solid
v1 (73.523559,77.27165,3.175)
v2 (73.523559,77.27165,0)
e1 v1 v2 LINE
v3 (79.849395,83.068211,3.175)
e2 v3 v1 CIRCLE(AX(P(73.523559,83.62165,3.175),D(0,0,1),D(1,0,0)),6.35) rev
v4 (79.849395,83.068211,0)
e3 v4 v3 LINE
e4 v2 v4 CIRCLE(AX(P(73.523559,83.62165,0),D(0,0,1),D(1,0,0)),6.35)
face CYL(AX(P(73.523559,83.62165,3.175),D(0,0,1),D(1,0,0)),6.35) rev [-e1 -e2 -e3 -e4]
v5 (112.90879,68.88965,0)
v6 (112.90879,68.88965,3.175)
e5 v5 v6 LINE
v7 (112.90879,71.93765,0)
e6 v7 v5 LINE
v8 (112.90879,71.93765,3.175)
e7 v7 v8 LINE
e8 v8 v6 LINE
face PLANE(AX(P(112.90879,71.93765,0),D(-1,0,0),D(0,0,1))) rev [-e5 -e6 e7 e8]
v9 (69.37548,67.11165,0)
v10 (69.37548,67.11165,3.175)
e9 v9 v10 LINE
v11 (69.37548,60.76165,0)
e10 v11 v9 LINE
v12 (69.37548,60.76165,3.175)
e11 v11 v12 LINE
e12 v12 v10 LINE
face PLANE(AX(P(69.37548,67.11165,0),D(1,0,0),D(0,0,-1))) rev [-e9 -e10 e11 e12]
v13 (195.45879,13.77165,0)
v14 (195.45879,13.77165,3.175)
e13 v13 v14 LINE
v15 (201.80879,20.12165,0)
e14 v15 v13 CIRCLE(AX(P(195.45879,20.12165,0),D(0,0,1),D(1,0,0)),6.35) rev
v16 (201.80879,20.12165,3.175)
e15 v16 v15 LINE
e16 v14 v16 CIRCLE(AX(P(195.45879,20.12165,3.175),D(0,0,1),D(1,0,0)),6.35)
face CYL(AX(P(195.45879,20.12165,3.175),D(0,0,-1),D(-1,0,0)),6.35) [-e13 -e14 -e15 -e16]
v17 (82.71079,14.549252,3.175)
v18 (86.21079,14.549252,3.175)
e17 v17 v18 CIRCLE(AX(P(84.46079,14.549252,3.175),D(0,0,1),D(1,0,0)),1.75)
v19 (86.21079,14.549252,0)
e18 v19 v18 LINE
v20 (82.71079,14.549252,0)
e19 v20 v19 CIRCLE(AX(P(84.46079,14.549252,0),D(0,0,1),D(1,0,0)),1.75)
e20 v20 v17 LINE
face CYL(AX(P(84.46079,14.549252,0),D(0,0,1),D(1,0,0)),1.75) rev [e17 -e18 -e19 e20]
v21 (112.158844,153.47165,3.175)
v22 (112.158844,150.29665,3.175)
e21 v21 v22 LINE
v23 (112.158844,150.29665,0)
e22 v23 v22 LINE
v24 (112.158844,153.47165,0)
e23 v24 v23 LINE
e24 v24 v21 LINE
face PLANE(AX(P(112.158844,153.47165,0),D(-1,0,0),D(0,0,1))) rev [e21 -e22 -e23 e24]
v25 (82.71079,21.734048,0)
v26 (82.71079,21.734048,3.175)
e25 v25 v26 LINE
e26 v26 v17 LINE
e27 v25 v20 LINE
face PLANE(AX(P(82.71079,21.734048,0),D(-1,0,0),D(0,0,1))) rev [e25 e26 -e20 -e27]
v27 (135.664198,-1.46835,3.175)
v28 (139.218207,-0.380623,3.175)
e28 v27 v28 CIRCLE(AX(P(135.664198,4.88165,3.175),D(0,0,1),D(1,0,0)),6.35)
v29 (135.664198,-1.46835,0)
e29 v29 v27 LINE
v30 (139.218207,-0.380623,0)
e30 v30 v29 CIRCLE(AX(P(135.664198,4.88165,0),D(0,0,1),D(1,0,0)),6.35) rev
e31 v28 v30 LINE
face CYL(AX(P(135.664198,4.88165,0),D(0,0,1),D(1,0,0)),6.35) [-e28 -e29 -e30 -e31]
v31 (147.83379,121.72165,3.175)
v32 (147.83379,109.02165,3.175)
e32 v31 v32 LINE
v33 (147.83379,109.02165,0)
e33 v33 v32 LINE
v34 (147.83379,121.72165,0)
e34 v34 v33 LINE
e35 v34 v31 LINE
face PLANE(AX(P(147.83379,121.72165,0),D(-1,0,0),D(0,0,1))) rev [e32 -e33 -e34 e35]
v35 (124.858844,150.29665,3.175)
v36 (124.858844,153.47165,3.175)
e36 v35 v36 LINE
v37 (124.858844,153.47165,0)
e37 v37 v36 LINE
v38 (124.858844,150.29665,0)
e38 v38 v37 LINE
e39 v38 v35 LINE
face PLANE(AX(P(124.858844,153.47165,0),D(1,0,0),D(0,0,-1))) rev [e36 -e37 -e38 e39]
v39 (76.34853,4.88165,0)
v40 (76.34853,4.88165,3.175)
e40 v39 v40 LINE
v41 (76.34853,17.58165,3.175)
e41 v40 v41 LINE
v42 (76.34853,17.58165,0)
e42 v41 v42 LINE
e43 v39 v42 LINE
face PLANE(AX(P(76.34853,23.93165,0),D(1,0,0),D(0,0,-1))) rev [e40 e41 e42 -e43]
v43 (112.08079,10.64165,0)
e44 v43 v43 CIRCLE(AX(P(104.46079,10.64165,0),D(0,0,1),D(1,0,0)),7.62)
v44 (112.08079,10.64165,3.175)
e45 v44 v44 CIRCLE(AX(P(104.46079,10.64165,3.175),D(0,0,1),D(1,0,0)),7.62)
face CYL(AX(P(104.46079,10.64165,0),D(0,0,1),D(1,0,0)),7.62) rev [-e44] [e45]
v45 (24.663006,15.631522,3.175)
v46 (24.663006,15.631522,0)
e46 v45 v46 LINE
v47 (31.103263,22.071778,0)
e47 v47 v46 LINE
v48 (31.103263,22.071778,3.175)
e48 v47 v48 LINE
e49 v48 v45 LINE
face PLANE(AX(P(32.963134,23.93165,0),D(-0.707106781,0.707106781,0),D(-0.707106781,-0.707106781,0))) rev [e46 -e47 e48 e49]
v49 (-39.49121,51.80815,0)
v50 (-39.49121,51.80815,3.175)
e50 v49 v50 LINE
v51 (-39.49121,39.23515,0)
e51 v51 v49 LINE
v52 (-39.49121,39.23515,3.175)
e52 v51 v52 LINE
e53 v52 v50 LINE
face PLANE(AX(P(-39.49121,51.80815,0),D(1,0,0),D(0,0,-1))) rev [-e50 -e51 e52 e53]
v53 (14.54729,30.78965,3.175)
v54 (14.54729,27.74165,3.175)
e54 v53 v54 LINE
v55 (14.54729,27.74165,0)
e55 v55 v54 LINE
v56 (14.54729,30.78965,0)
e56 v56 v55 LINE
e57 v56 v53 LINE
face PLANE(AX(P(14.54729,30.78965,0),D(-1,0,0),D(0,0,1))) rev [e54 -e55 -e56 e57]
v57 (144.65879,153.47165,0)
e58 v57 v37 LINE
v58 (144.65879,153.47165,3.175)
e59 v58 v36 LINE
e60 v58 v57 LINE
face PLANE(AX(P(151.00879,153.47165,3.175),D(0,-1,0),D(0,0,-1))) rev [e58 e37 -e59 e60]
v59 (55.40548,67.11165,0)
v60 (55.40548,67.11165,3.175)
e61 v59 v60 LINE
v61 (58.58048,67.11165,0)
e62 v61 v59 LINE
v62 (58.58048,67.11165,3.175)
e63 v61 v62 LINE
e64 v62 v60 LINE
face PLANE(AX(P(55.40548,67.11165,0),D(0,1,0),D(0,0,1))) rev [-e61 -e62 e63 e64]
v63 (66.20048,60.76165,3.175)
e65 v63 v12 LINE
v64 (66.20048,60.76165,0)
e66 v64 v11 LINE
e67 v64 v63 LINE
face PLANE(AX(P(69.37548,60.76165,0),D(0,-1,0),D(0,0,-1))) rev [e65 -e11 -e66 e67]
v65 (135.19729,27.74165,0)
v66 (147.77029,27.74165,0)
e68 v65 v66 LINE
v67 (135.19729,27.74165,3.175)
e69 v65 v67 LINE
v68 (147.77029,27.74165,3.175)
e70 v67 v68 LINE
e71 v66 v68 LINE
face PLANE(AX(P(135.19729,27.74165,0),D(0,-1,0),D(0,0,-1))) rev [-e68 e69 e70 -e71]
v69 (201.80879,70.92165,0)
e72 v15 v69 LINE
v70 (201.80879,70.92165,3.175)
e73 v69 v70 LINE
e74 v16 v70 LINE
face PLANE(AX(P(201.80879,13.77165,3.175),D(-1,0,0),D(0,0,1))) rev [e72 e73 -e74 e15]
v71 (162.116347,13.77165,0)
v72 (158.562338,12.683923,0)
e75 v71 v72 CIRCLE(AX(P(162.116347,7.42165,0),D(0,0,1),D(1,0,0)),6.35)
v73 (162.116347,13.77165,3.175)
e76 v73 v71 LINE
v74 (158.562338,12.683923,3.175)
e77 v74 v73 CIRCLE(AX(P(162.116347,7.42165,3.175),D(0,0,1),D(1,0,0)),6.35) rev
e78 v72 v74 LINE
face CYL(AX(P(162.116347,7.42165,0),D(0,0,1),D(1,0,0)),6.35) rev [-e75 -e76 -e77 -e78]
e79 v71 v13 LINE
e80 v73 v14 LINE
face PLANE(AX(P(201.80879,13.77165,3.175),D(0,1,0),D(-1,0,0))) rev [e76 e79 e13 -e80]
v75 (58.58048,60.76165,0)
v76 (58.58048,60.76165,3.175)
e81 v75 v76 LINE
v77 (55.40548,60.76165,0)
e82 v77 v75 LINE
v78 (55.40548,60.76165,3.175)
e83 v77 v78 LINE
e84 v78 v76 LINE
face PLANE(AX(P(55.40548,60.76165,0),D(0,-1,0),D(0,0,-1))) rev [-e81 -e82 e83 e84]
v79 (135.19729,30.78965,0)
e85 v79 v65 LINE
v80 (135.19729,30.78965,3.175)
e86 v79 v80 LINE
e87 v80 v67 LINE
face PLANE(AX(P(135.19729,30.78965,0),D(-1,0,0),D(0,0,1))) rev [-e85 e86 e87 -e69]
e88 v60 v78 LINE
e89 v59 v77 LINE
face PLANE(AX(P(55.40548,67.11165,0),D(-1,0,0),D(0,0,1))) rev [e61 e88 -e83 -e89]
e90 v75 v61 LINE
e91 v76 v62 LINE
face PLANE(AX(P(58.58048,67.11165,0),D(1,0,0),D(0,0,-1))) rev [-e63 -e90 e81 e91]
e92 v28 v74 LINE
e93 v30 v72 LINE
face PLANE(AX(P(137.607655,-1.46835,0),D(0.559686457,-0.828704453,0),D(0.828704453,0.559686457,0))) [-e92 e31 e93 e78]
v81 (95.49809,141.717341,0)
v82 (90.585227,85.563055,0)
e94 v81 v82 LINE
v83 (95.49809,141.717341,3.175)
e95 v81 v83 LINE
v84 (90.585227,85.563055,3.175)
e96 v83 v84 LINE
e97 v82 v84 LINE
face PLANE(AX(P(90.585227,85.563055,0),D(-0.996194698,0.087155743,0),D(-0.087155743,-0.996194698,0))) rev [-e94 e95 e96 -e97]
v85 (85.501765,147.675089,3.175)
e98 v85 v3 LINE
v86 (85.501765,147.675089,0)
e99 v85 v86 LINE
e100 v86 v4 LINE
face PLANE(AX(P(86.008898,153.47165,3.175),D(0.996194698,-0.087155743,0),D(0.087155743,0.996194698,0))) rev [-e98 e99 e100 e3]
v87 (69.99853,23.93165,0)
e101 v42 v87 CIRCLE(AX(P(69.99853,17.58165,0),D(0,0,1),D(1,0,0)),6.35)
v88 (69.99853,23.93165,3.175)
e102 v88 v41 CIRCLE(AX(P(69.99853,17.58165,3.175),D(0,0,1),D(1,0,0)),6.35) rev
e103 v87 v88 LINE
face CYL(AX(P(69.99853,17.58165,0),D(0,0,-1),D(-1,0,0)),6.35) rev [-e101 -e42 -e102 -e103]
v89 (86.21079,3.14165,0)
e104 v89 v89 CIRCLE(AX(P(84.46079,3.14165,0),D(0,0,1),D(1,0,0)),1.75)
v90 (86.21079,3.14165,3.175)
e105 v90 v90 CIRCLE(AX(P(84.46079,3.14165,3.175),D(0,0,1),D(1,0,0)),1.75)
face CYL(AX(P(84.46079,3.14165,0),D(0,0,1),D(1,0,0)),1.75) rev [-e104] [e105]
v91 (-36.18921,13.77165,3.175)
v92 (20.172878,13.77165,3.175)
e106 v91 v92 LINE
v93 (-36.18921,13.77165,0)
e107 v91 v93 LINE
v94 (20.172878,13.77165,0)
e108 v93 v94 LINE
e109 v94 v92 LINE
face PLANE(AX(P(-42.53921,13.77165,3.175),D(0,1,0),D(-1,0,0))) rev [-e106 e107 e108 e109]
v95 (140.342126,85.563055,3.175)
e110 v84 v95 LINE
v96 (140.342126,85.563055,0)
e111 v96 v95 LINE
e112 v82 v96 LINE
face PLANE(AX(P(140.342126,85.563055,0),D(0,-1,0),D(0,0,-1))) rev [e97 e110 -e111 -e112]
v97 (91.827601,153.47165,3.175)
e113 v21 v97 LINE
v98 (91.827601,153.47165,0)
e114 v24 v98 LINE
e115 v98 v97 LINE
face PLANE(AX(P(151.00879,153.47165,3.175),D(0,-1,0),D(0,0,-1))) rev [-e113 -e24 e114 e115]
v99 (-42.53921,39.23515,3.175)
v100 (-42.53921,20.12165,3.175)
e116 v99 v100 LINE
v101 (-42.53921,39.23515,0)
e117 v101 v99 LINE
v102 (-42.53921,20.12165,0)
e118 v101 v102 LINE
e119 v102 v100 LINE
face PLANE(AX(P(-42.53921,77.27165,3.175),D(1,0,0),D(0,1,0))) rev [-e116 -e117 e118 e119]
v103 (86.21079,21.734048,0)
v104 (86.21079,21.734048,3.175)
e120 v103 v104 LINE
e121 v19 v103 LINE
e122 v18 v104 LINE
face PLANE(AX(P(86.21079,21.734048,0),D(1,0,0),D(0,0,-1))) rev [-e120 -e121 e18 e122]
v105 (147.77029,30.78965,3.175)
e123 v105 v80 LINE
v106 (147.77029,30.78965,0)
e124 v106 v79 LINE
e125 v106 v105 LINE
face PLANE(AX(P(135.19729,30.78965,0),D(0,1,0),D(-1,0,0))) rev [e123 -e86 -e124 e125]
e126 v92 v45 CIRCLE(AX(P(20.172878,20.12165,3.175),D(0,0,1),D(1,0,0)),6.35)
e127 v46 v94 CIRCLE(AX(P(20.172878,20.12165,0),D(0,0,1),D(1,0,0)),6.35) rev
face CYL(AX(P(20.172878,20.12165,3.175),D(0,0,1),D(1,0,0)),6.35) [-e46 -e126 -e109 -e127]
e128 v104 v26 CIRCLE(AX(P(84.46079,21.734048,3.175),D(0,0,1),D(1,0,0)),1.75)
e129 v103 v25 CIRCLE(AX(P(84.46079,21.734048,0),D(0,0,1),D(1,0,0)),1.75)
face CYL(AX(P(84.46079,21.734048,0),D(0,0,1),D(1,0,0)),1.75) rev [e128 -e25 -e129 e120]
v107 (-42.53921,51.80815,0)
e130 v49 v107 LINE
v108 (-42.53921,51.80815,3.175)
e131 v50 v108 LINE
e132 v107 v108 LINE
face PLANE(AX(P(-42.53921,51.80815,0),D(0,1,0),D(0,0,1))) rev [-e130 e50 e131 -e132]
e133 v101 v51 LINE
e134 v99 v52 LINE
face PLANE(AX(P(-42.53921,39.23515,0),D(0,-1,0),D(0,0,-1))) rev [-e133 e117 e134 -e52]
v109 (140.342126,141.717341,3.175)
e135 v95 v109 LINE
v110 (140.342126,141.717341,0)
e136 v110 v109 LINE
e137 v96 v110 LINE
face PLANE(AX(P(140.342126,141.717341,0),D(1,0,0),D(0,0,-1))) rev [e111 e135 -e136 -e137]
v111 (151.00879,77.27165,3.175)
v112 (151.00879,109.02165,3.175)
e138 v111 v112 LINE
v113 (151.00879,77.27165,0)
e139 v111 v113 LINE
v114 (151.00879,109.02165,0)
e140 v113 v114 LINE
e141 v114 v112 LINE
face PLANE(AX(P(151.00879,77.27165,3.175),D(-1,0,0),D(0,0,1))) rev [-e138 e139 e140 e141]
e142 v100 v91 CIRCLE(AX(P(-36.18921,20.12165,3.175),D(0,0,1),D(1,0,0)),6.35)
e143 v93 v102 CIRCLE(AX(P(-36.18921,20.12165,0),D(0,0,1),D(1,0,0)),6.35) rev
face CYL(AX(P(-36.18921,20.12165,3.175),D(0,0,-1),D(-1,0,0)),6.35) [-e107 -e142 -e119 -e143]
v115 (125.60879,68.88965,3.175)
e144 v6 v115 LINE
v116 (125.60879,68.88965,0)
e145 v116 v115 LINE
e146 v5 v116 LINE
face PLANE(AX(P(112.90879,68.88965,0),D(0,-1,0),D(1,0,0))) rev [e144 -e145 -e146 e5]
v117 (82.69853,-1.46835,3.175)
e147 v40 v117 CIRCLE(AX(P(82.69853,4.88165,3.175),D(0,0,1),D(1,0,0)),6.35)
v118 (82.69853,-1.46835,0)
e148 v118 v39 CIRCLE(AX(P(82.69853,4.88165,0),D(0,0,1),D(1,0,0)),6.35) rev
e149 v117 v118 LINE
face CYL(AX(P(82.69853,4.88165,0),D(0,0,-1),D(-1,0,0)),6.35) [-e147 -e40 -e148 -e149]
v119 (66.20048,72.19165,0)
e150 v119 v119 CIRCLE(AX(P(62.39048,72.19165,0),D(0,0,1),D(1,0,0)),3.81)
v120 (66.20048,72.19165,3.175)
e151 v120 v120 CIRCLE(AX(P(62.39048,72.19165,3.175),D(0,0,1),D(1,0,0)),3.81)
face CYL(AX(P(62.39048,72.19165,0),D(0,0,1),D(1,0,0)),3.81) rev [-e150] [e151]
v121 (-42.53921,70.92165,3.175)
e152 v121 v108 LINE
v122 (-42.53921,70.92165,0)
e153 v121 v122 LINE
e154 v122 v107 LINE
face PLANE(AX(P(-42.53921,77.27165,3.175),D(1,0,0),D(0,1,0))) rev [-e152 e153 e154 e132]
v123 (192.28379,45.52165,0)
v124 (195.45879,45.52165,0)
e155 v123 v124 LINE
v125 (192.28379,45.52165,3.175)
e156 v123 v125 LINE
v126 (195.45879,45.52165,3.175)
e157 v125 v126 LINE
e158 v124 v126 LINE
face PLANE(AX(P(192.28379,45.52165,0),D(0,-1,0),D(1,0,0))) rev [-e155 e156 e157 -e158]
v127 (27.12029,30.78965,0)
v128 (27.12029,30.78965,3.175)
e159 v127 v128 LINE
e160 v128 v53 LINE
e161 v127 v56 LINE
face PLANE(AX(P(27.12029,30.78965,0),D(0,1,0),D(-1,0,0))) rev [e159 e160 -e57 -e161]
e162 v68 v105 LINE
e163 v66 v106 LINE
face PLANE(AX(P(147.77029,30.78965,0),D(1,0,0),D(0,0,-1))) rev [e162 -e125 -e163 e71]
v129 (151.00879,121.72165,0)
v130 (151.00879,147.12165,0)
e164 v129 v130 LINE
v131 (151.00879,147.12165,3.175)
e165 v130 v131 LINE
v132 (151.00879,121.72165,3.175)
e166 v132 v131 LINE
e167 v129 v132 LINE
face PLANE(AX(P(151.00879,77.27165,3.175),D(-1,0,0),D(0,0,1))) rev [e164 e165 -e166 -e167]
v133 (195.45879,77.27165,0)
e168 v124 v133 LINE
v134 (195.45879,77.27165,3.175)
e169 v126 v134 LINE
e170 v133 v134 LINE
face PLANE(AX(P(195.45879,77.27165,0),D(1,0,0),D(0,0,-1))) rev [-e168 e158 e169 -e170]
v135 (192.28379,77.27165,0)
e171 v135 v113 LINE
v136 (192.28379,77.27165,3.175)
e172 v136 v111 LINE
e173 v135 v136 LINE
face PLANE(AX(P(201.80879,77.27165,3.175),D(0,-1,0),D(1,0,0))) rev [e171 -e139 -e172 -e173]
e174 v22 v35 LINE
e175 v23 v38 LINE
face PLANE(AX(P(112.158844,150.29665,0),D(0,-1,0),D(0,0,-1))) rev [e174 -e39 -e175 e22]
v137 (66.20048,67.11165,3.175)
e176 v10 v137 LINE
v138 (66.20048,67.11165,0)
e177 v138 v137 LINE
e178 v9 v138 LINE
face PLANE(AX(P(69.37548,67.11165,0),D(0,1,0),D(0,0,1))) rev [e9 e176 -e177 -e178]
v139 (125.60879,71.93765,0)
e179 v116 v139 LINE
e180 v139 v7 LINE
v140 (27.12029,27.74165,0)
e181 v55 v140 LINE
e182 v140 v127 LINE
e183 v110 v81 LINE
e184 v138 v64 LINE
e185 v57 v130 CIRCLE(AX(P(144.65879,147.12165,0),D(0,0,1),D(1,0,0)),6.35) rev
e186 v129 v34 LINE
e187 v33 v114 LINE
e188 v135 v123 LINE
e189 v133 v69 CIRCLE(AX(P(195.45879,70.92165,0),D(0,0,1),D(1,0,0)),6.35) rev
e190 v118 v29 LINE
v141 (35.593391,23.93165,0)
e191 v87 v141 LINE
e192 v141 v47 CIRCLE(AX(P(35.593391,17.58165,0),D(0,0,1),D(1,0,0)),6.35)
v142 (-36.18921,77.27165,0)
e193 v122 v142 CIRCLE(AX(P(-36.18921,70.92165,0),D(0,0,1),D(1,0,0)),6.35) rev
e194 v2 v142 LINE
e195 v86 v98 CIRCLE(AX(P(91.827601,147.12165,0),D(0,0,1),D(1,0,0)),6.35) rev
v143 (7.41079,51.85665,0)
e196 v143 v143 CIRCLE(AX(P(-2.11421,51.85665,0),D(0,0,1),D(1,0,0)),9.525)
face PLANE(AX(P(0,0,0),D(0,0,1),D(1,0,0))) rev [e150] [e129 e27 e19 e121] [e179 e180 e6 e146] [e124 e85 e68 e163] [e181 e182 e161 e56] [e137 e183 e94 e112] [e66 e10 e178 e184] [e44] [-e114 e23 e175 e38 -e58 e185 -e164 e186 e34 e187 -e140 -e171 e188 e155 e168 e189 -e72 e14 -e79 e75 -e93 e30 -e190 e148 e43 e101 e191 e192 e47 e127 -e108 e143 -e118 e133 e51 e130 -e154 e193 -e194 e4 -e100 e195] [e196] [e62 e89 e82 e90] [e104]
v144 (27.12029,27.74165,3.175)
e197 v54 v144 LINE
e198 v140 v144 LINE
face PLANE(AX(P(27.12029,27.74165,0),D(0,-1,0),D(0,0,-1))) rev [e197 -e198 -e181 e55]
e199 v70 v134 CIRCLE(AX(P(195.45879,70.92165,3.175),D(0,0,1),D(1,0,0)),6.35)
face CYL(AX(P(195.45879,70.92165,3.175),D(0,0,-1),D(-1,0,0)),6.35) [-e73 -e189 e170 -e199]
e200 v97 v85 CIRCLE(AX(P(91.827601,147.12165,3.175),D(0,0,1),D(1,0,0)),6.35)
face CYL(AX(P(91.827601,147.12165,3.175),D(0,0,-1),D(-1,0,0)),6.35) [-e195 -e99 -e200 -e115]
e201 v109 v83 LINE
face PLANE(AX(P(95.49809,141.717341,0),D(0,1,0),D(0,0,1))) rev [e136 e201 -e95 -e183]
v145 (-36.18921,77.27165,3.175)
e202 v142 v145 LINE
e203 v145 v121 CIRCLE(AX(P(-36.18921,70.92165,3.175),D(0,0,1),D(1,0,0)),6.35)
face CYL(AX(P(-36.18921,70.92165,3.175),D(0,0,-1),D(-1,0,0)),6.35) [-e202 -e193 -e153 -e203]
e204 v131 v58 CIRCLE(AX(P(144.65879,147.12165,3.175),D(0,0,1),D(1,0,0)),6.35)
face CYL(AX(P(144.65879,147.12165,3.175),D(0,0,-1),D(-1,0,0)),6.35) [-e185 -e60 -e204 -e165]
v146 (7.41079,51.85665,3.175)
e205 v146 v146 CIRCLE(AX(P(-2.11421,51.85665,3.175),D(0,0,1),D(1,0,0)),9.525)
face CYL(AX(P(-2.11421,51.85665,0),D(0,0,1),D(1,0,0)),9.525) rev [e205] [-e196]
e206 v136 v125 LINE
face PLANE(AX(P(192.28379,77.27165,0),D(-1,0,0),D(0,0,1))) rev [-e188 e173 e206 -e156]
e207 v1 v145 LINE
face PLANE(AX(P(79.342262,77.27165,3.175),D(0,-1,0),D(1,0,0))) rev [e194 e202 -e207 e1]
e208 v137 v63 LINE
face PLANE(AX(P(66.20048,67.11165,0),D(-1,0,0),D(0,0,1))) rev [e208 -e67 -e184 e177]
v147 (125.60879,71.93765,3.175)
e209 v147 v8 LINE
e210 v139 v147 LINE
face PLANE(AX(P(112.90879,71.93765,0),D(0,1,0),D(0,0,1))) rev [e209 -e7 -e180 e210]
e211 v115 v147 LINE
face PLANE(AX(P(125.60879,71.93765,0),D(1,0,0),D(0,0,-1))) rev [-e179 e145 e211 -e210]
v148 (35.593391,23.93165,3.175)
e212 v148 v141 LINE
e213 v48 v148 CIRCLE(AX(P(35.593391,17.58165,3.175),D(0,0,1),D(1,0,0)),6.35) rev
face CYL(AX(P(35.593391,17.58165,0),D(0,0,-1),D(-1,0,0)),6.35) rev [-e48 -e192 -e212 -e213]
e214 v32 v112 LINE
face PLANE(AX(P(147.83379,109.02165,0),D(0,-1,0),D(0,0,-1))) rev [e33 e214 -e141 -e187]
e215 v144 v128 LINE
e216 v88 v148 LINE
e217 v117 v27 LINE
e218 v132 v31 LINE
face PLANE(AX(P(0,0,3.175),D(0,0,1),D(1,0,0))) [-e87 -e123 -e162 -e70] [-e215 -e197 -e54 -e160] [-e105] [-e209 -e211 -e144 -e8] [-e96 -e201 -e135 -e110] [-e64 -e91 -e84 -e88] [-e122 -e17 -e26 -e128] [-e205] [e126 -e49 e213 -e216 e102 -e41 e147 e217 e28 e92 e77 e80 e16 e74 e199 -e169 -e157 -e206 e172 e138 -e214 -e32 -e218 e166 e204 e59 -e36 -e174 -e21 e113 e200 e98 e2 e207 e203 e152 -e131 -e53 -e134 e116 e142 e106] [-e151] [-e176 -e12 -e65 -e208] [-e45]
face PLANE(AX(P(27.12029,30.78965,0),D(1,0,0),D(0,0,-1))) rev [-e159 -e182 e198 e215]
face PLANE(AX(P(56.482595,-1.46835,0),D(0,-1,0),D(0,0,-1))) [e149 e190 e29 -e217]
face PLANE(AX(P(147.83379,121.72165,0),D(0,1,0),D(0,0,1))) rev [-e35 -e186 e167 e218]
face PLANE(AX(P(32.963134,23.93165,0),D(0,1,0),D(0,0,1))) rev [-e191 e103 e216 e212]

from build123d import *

# Parameters (mm, degrees)
MAIN_SIDE_DEPTH          = 3.175
SKETCH2_W                = 12.573
SKETCH2_H                = 3.048
BOTTOM_PLATE_HOLES_DEPTH = 254.555547868
SKETCH3_W                = 12.7
SKETCH3_H                = 3.048
CUT_EXTRUDE1_DEPTH       = 254.555547868
SKETCH4_W                = 3.048
SKETCH4_H                = 12.573
CUT_EXTRUDE2_DEPTH       = 254.555547868
SKETCH5_W                = 3.175
SKETCH5_H                = 31.75
CUT_EXTRUDE3_DEPTH       = 254.555547868
SKETCH6_R                = 9.525
CUT_EXTRUDE4_DEPTH       = 254.555547868
SKETCH7_W                = 12.7
SKETCH7_H                = 3.175
CUT_EXTRUDE5_DEPTH       = 254.555547868
SKETCH8_W                = 3.175
SKETCH8_H                = 12.7
CUT_EXTRUDE6_DEPTH       = 254.555547868
BOSS_EXTRUDE2_DEPTH      = 3.175
SKETCH10_R               = 1.75
SKETCH10_R_2             = 7.62
CUT_EXTRUDE7_DEPTH       = 254.555547868
FILLET1_R                = 6.35
SKETCH14_R               = 3.81
SKETCH14_W               = 3.175
SKETCH14_H               = 6.35
CUT_EXTRUDE8_DEPTH       = 254.555547868
CUT_EXTRUDE9_DEPTH       = 254.555547868
CUT_EXTRUDE10_DEPTH      = 254.555547868
FILLET2_R                = 6.35


with BuildPart() as part:
    # Sketch1 → Main Side (new body)
    with BuildSketch(Plane.XY):
        Polygon((62.123903317, 7.421650144), (131.966346795, 7.421650144), (147.472889282, 13.771650144), (201.808790274, 13.771650144), (201.808790274, 77.271650144), (151.008790274, 77.271650144), (151.008790274, 153.471650144), (86.008898009, 153.471650144), (79.342261849, 77.271650144), (-42.539209726, 77.271650144), (-42.539209726, 13.771650144), (46.617360741, 13.771650144), align=None)
    extrude(amount=MAIN_SIDE_DEPTH)

    # Sketch2 → Bottom Plate Holes (cut, through all)
    with BuildSketch(Plane.XY.offset(3.175)):
        with Locations((141.483790274, 29.265650144)):
            Rectangle(SKETCH2_W, SKETCH2_H)
        with Locations((20.833790274, 29.265650144)):
            Rectangle(SKETCH2_W, SKETCH2_H)
    extrude(amount=-BOTTOM_PLATE_HOLES_DEPTH, mode=Mode.SUBTRACT)

    # Sketch3 → Cut-Extrude1 (cut, through all)
    with BuildSketch(Plane.XY.offset(3.175)):
        with Locations((119.258790274, 70.413650144)):
            Rectangle(SKETCH3_W, SKETCH3_H)
    extrude(amount=-CUT_EXTRUDE1_DEPTH, mode=Mode.SUBTRACT)

    # Sketch4 → Cut-Extrude2 (cut, through all)
    with BuildSketch(Plane.XY.offset(3.175)):
        with Locations((-41.015209726, 45.521650144)):
            Rectangle(SKETCH4_W, SKETCH4_H)
    extrude(amount=-CUT_EXTRUDE2_DEPTH, mode=Mode.SUBTRACT)

    # Sketch5 → Cut-Extrude3 (cut, through all)
    with BuildSketch(Plane.XY.offset(3.175)):
        with Locations((193.871290274, 61.396650144)):
            Rectangle(SKETCH5_W, SKETCH5_H)
    extrude(amount=-CUT_EXTRUDE3_DEPTH, mode=Mode.SUBTRACT)

    # Sketch6 → Cut-Extrude4 (cut, through all)
    with BuildSketch(Plane.XY.offset(3.175)):
        with Locations((-2.114209726, 51.856650144)):
            Circle(SKETCH6_R)
    extrude(amount=-CUT_EXTRUDE4_DEPTH, mode=Mode.SUBTRACT)

    # Sketch7 → Cut-Extrude5 (cut, through all)
    with BuildSketch(Plane.XY.offset(3.175)):
        with Locations((118.508844141, 151.884150144)):
            Rectangle(SKETCH7_W, SKETCH7_H)
    extrude(amount=-CUT_EXTRUDE5_DEPTH, mode=Mode.SUBTRACT)

    # Sketch8 → Cut-Extrude6 (cut, through all)
    with BuildSketch(Plane.XY.offset(3.175)):
        with Locations((149.421290274, 115.371650144)):
            Rectangle(SKETCH8_W, SKETCH8_H)
    extrude(amount=-CUT_EXTRUDE6_DEPTH, mode=Mode.SUBTRACT)

    # Sketch13 → Boss-Extrude2 (add)
    with BuildSketch(Plane.XY.offset(3.175)):
        Polygon((33.917360741, 13.771650144), (56.482594802, -1.468349856), (137.607655293, -1.468349856), (160.172889282, 13.771650144), (147.472889282, 13.771650144), (131.966346795, 7.421650144), (62.123903317, 7.421650144), (46.617360741, 13.771650144), align=None)
    extrude(amount=-BOSS_EXTRUDE2_DEPTH)

    # Sketch10 → Cut-Extrude7 (cut, through all)
    with BuildSketch(Plane.XY.offset(3.175)):
        with Locations((84.460790274, 3.141650144)):
            Circle(SKETCH10_R)
        with Locations((104.460790274, 10.641650144)):
            Circle(SKETCH10_R_2)
        with BuildLine():
            Line((86.210790274, 21.734048116), (86.210790274, 14.549252171))
            ThreePointArc((86.210790274, 14.549252171), (84.460790274, 12.799252171), (82.710790274, 14.549252171))
            Line((82.710790274, 14.549252171), (82.710790274, 21.734048116))
            ThreePointArc((82.710790274, 21.734048116), (84.460790274, 23.484048116), (86.210790274, 21.734048116))
        make_face()
    extrude(amount=-CUT_EXTRUDE7_DEPTH, mode=Mode.SUBTRACT)

    # Fillet1
    fillet1_edges = [part.edges().sort_by_distance(p)[0] for p in [
        (33.917360741, 13.771650144, 1.5875),
        (160.172889282, 13.771650144, 1.5875),
        (137.607655293, -1.468349856, 1.5875),
        (56.482594802, -1.468349856, 1.5875),
        (-42.539209726, 13.771650144, 1.5875),
        (-42.539209726, 77.271650144, 1.5875),
        (79.342261849, 77.271650144, 1.5875),
        (86.008898009, 153.471650144, 1.5875),
        (151.008790274, 153.471650144, 1.5875),
        (201.808790274, 77.271650144, 1.5875),
        (201.808790274, 13.771650144, 1.5875),
    ]]
    fillet(fillet1_edges, radius=FILLET1_R - 0.0001)  # a hair under: the kernel refuses the full size

    # Sketch14 → Cut-Extrude8 (cut, through all)
    with BuildSketch(Plane.XY.offset(3.175)):
        with Locations((62.390480298, 6.151650144)):
            Circle(SKETCH14_R)
        with Locations((62.390480298, 72.191650144)):
            Circle(SKETCH14_R)
        with Locations((56.992980298, 63.936650144)):
            Rectangle(SKETCH14_W, SKETCH14_H)
        with Locations((67.787980298, 63.936650144)):
            Rectangle(SKETCH14_W, SKETCH14_H)
        with Locations((67.787980298, 14.406650144)):
            Rectangle(SKETCH14_W, SKETCH14_H)
        with Locations((56.992980298, 14.406650144)):
            Rectangle(SKETCH14_W, SKETCH14_H)
    extrude(amount=-CUT_EXTRUDE8_DEPTH, mode=Mode.SUBTRACT)

    # Sketch15 → Cut-Extrude9 (cut, through all)
    with BuildSketch(Plane.XY.offset(3.175)):
        Polygon((90.585226868, 85.563055457), (95.498090229, 141.717340628), (140.342125594, 141.717340628), (140.342125594, 85.563055457), align=None)
    extrude(amount=-CUT_EXTRUDE9_DEPTH, mode=Mode.SUBTRACT)

    # Sketch16 → Cut-Extrude10 (cut, through all)
    with BuildSketch(Plane.XY.offset(3.175)):
        Polygon((32.963134486, 23.931650144), (76.348530262, 23.931650144), (76.348530262, -1.468349856), (32.963134486, -1.468349856), (32.963134486, 12.534188724), (21.565673066, 12.534188724), align=None)
    extrude(amount=-CUT_EXTRUDE10_DEPTH, mode=Mode.SUBTRACT)

    # Fillet2
    fillet2_edges = [part.edges().sort_by_distance(p)[0] for p in [
        (22.803134486, 13.771650144, 1.5875),
        (76.348530262, -1.468349856, 1.5875),
        (32.963134486, 23.931650144, 1.5875),
        (76.348530262, 23.931650144, 1.5875),
    ]]
    fillet(fillet2_edges, radius=FILLET2_R)


solid = part.part
